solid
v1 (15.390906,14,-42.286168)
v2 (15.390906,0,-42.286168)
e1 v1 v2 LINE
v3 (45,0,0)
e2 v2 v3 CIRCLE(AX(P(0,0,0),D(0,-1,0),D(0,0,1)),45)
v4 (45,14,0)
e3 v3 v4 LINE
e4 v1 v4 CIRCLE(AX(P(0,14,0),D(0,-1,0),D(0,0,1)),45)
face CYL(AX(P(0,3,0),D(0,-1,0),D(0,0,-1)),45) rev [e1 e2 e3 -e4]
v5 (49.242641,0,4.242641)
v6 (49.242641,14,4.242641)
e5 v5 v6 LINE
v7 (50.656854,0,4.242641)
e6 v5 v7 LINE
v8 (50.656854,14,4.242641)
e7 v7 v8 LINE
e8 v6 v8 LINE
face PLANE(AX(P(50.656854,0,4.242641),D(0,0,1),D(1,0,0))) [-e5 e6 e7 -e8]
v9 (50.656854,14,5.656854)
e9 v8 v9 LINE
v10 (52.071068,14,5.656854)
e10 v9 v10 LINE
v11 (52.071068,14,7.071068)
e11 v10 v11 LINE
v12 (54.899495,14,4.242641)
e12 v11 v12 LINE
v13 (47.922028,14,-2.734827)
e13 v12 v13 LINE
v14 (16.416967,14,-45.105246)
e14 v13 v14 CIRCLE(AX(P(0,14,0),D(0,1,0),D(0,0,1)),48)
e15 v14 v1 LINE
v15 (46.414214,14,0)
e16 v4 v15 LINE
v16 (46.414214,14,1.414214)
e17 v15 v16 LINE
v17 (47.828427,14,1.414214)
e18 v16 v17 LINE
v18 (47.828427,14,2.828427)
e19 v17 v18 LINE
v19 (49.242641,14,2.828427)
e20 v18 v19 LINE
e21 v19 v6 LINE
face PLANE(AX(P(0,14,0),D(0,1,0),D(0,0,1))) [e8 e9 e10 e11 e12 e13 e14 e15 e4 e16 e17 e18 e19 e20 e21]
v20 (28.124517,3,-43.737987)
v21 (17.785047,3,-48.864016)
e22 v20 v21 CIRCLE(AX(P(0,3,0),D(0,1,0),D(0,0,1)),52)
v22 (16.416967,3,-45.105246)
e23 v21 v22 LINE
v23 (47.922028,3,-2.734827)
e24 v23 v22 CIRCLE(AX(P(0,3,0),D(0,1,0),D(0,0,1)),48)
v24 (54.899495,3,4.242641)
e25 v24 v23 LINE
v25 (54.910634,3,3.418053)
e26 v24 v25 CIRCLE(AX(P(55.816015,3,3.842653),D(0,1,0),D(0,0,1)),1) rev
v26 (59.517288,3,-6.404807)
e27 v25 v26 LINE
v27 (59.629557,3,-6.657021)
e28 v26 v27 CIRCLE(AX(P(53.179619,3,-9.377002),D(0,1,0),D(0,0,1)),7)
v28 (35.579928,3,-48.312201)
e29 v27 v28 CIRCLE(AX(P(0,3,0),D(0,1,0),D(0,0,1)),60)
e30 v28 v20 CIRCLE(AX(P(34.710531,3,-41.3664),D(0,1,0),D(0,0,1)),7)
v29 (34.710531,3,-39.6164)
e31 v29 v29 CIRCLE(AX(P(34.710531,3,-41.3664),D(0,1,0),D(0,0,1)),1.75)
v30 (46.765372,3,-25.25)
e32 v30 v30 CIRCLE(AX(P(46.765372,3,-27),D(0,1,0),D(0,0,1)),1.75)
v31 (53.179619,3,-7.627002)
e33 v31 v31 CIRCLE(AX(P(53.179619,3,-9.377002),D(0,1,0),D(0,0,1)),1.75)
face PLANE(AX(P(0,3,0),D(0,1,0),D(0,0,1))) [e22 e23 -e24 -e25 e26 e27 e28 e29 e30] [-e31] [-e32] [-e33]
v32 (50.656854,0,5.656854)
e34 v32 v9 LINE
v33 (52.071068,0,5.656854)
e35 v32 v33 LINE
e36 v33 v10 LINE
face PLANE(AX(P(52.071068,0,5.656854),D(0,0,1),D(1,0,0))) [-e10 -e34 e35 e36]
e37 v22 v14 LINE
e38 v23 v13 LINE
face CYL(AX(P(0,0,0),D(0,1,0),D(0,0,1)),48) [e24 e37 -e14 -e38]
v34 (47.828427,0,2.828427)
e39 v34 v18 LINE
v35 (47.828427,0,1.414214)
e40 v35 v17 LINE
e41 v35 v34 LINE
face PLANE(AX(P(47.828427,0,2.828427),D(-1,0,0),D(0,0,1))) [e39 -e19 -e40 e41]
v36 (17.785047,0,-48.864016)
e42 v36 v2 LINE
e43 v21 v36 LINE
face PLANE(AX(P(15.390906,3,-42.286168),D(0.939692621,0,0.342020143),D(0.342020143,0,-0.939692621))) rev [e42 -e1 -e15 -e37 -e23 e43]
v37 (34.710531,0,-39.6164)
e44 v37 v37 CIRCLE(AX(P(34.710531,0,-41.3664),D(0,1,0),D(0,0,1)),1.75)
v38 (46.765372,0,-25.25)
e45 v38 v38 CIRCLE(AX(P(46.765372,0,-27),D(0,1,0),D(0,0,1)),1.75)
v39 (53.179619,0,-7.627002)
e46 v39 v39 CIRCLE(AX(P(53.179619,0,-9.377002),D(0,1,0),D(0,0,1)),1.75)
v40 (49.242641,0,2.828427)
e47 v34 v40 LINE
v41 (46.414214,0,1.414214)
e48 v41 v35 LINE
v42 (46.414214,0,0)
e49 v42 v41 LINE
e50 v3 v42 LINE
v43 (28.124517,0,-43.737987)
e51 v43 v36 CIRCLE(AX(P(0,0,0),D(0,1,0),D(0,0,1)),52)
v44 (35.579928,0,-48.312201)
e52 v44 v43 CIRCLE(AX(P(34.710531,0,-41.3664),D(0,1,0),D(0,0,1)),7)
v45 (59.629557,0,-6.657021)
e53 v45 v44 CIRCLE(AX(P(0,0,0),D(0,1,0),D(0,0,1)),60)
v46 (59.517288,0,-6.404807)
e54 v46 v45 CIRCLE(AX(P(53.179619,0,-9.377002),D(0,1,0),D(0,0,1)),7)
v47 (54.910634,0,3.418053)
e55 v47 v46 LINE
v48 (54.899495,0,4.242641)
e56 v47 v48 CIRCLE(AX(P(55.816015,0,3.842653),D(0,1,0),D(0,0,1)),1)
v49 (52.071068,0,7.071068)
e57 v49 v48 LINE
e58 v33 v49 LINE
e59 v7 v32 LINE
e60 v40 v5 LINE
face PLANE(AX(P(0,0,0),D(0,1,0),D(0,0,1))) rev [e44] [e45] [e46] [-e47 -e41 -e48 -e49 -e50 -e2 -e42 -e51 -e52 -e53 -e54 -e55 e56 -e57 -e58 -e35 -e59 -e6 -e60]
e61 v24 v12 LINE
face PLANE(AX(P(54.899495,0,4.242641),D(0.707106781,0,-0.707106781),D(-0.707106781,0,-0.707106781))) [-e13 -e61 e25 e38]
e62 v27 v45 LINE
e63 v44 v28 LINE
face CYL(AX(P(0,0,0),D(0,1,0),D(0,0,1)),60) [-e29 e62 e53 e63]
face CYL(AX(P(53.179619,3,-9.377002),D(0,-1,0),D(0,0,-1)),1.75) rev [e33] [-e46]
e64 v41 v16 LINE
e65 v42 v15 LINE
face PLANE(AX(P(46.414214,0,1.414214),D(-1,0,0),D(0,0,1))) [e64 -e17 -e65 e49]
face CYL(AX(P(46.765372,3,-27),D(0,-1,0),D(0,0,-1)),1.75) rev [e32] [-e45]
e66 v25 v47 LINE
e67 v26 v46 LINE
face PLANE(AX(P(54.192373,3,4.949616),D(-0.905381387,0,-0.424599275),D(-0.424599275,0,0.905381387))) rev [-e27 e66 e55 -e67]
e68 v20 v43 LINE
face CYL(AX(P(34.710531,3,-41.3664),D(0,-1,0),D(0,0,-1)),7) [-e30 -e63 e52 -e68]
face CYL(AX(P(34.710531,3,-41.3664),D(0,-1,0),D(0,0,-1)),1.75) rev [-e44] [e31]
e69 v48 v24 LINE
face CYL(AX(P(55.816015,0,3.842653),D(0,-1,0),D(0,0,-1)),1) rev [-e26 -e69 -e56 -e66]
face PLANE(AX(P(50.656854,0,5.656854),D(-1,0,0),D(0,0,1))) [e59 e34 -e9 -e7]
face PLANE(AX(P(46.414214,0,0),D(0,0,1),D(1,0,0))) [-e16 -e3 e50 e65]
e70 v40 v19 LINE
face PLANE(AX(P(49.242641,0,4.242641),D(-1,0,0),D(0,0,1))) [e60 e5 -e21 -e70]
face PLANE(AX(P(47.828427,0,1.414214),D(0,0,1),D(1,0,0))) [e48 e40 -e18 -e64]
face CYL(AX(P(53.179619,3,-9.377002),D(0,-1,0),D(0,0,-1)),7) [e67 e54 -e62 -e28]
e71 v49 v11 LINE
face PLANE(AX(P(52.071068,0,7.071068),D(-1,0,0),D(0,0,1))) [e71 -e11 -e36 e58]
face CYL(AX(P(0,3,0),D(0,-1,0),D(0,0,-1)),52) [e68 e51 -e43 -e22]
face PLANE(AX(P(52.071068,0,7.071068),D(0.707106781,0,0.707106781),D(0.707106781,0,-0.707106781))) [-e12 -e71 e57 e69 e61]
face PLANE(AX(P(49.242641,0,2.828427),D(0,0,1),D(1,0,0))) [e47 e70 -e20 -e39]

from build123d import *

# Parameters (mm, degrees)
SKETCH_1_R               = 1.75
EXTRUDE_1_DEPTH          = 3
EXTRUDE_2_DEPTH          = 11
EXTRUDE_2_DEPTH_BACK     = 3
CUT_EXTRUDE_1_DEPTH      = 79.296095621
CUT_EXTRUDE_1_DEPTH_BACK = 79.296095621
SKETCH_4_R               = 75.737398045
SKETCH_4_R_2             = 60
FILLET_1_R               = 1


with BuildPart() as part:
    # Эскиз1 → Бобышка-Вытянуть1 (new body)
    with BuildSketch(Plane(origin=(0, 0, 0), x_dir=(1, 0, 0), z_dir=(0, 1, 0))):
        with BuildLine():
            Line((15.39090645, 42.286167935), (17.785047453, 48.864016281))
            ThreePointArc((17.785047453, 48.864016281), (23.097425832, 46.588720952), (28.124517408, 43.737987157))
            ThreePointArc((28.124517408, 43.737987157), (32.887215772, 48.124766732), (39.210044191, 46.72871103))
            ThreePointArc((39.210044191, 46.72871103), (52.827549631, 30.5), (60.073272934, 10.592538838))
            ThreePointArc((60.073272934, 10.592538838), (60.118729466, 8.455730047), (59.51728837, 6.404806668))
            Line((59.51728837, 6.404806668), (54.192372599, -4.949615977))
            Line((54.192372599, -4.949615977), (44.777960949, 4.464774712))
            ThreePointArc((44.777960949, 4.464774712), (35.534315772, 27.610005481), (15.39090645, 42.286167935))
        make_face()
        with Locations(Location((34.710530923, 41.366399928, 0), (0, 0, 270))):
            Circle(SKETCH_1_R, mode=Mode.SUBTRACT)
        with Locations(Location((46.765371804, 27, 0), (0, 0, 270))):
            Circle(SKETCH_1_R, mode=Mode.SUBTRACT)
        with Locations(Location((53.179618663, 9.377001594, 0), (0, 0, 270))):
            Circle(SKETCH_1_R, mode=Mode.SUBTRACT)
    extrude(amount=EXTRUDE_1_DEPTH)

    # Эскиз2 → Бобышка-Вытянуть2 (add, two sides: drawn at the far end of the back side and taken through both)
    with BuildSketch(Plane(origin=(0, 3, 0), x_dir=(1, 0, 0), z_dir=(0, 1, 0)).offset(-EXTRUDE_2_DEPTH_BACK)):
        with BuildLine():
            Line((52.071067812, -7.071067812), (52.071067812, -5.656854249))
            Line((52.071067812, -5.656854249), (50.656854249, -5.656854249))
            Line((50.656854249, -5.656854249), (50.656854249, -4.242640687))
            Line((50.656854249, -4.242640687), (49.242640687, -4.242640687))
            Line((49.242640687, -4.242640687), (49.242640687, -2.828427125))
            Line((49.242640687, -2.828427125), (47.828427125, -2.828427125))
            Line((47.828427125, -2.828427125), (47.828427125, -1.414213562))
            Line((47.828427125, -1.414213562), (46.414213562, -1.414213562))
            Line((46.414213562, -1.414213562), (46.414213562, 0))
            Line((46.414213562, 0), (45, 0))
            ThreePointArc((45, 0), (36.861841993, 25.810939636), (15.39090645, 42.286167935))
            Line((15.39090645, 42.286167935), (16.41696688, 45.105245798))
            ThreePointArc((16.41696688, 45.105245798), (38.518692264, 28.641060494), (47.922027533, 2.734826717))
            Line((47.922027533, 2.734826717), (54.899494937, -4.242640687))
            Line((54.899494937, -4.242640687), (52.071067812, -7.071067812))
        make_face()
    extrude(amount=EXTRUDE_2_DEPTH + EXTRUDE_2_DEPTH_BACK)

    # Эскиз4 → Вырез-Вытянуть1 (cut, two sides: drawn at the far end of the back side and taken through both)
    with BuildSketch(Plane(origin=(0, 3, 0), x_dir=(1, 0, 0), z_dir=(0, 1, 0)).offset(-CUT_EXTRUDE_1_DEPTH_BACK)):
        Circle(SKETCH_4_R)
        Circle(SKETCH_4_R_2, mode=Mode.SUBTRACT)
    extrude(amount=CUT_EXTRUDE_1_DEPTH + CUT_EXTRUDE_1_DEPTH_BACK, mode=Mode.SUBTRACT)

    # Скругление1
    # the kernel refuses this fillet: 1 mm, written as the material it adds along each edge
    with BuildSketch(Plane(origin=(54.643826402, 0, 3.986972152), x_dir=(0.7071067811866617, 0, 0.7071067811864333), z_dir=(0, 1, 0))) as fillet_1_piece_1:
        with BuildLine():
            CenterArc((0.726813354, 0.93091204), FILLET_1_R, 199.874698522, 48.702735989)
            Line((-0.213624991, 0.590947748), (-0.232433757, 0.584148463))
            Line((-0.232433757, 0.584148463), (-0.018808767, -0.006799286))
            Line((-0.018808767, -0.006799286), (0, -0.02))
            ThreePointArc((0, -0.02), (0.180784955, -0.02), (0.35426504, -0.018618241))
            Line((0.35426504, -0.018618241), (0.361569909, 0))
        make_face()
    extrude(amount=3)


solid = part.part
